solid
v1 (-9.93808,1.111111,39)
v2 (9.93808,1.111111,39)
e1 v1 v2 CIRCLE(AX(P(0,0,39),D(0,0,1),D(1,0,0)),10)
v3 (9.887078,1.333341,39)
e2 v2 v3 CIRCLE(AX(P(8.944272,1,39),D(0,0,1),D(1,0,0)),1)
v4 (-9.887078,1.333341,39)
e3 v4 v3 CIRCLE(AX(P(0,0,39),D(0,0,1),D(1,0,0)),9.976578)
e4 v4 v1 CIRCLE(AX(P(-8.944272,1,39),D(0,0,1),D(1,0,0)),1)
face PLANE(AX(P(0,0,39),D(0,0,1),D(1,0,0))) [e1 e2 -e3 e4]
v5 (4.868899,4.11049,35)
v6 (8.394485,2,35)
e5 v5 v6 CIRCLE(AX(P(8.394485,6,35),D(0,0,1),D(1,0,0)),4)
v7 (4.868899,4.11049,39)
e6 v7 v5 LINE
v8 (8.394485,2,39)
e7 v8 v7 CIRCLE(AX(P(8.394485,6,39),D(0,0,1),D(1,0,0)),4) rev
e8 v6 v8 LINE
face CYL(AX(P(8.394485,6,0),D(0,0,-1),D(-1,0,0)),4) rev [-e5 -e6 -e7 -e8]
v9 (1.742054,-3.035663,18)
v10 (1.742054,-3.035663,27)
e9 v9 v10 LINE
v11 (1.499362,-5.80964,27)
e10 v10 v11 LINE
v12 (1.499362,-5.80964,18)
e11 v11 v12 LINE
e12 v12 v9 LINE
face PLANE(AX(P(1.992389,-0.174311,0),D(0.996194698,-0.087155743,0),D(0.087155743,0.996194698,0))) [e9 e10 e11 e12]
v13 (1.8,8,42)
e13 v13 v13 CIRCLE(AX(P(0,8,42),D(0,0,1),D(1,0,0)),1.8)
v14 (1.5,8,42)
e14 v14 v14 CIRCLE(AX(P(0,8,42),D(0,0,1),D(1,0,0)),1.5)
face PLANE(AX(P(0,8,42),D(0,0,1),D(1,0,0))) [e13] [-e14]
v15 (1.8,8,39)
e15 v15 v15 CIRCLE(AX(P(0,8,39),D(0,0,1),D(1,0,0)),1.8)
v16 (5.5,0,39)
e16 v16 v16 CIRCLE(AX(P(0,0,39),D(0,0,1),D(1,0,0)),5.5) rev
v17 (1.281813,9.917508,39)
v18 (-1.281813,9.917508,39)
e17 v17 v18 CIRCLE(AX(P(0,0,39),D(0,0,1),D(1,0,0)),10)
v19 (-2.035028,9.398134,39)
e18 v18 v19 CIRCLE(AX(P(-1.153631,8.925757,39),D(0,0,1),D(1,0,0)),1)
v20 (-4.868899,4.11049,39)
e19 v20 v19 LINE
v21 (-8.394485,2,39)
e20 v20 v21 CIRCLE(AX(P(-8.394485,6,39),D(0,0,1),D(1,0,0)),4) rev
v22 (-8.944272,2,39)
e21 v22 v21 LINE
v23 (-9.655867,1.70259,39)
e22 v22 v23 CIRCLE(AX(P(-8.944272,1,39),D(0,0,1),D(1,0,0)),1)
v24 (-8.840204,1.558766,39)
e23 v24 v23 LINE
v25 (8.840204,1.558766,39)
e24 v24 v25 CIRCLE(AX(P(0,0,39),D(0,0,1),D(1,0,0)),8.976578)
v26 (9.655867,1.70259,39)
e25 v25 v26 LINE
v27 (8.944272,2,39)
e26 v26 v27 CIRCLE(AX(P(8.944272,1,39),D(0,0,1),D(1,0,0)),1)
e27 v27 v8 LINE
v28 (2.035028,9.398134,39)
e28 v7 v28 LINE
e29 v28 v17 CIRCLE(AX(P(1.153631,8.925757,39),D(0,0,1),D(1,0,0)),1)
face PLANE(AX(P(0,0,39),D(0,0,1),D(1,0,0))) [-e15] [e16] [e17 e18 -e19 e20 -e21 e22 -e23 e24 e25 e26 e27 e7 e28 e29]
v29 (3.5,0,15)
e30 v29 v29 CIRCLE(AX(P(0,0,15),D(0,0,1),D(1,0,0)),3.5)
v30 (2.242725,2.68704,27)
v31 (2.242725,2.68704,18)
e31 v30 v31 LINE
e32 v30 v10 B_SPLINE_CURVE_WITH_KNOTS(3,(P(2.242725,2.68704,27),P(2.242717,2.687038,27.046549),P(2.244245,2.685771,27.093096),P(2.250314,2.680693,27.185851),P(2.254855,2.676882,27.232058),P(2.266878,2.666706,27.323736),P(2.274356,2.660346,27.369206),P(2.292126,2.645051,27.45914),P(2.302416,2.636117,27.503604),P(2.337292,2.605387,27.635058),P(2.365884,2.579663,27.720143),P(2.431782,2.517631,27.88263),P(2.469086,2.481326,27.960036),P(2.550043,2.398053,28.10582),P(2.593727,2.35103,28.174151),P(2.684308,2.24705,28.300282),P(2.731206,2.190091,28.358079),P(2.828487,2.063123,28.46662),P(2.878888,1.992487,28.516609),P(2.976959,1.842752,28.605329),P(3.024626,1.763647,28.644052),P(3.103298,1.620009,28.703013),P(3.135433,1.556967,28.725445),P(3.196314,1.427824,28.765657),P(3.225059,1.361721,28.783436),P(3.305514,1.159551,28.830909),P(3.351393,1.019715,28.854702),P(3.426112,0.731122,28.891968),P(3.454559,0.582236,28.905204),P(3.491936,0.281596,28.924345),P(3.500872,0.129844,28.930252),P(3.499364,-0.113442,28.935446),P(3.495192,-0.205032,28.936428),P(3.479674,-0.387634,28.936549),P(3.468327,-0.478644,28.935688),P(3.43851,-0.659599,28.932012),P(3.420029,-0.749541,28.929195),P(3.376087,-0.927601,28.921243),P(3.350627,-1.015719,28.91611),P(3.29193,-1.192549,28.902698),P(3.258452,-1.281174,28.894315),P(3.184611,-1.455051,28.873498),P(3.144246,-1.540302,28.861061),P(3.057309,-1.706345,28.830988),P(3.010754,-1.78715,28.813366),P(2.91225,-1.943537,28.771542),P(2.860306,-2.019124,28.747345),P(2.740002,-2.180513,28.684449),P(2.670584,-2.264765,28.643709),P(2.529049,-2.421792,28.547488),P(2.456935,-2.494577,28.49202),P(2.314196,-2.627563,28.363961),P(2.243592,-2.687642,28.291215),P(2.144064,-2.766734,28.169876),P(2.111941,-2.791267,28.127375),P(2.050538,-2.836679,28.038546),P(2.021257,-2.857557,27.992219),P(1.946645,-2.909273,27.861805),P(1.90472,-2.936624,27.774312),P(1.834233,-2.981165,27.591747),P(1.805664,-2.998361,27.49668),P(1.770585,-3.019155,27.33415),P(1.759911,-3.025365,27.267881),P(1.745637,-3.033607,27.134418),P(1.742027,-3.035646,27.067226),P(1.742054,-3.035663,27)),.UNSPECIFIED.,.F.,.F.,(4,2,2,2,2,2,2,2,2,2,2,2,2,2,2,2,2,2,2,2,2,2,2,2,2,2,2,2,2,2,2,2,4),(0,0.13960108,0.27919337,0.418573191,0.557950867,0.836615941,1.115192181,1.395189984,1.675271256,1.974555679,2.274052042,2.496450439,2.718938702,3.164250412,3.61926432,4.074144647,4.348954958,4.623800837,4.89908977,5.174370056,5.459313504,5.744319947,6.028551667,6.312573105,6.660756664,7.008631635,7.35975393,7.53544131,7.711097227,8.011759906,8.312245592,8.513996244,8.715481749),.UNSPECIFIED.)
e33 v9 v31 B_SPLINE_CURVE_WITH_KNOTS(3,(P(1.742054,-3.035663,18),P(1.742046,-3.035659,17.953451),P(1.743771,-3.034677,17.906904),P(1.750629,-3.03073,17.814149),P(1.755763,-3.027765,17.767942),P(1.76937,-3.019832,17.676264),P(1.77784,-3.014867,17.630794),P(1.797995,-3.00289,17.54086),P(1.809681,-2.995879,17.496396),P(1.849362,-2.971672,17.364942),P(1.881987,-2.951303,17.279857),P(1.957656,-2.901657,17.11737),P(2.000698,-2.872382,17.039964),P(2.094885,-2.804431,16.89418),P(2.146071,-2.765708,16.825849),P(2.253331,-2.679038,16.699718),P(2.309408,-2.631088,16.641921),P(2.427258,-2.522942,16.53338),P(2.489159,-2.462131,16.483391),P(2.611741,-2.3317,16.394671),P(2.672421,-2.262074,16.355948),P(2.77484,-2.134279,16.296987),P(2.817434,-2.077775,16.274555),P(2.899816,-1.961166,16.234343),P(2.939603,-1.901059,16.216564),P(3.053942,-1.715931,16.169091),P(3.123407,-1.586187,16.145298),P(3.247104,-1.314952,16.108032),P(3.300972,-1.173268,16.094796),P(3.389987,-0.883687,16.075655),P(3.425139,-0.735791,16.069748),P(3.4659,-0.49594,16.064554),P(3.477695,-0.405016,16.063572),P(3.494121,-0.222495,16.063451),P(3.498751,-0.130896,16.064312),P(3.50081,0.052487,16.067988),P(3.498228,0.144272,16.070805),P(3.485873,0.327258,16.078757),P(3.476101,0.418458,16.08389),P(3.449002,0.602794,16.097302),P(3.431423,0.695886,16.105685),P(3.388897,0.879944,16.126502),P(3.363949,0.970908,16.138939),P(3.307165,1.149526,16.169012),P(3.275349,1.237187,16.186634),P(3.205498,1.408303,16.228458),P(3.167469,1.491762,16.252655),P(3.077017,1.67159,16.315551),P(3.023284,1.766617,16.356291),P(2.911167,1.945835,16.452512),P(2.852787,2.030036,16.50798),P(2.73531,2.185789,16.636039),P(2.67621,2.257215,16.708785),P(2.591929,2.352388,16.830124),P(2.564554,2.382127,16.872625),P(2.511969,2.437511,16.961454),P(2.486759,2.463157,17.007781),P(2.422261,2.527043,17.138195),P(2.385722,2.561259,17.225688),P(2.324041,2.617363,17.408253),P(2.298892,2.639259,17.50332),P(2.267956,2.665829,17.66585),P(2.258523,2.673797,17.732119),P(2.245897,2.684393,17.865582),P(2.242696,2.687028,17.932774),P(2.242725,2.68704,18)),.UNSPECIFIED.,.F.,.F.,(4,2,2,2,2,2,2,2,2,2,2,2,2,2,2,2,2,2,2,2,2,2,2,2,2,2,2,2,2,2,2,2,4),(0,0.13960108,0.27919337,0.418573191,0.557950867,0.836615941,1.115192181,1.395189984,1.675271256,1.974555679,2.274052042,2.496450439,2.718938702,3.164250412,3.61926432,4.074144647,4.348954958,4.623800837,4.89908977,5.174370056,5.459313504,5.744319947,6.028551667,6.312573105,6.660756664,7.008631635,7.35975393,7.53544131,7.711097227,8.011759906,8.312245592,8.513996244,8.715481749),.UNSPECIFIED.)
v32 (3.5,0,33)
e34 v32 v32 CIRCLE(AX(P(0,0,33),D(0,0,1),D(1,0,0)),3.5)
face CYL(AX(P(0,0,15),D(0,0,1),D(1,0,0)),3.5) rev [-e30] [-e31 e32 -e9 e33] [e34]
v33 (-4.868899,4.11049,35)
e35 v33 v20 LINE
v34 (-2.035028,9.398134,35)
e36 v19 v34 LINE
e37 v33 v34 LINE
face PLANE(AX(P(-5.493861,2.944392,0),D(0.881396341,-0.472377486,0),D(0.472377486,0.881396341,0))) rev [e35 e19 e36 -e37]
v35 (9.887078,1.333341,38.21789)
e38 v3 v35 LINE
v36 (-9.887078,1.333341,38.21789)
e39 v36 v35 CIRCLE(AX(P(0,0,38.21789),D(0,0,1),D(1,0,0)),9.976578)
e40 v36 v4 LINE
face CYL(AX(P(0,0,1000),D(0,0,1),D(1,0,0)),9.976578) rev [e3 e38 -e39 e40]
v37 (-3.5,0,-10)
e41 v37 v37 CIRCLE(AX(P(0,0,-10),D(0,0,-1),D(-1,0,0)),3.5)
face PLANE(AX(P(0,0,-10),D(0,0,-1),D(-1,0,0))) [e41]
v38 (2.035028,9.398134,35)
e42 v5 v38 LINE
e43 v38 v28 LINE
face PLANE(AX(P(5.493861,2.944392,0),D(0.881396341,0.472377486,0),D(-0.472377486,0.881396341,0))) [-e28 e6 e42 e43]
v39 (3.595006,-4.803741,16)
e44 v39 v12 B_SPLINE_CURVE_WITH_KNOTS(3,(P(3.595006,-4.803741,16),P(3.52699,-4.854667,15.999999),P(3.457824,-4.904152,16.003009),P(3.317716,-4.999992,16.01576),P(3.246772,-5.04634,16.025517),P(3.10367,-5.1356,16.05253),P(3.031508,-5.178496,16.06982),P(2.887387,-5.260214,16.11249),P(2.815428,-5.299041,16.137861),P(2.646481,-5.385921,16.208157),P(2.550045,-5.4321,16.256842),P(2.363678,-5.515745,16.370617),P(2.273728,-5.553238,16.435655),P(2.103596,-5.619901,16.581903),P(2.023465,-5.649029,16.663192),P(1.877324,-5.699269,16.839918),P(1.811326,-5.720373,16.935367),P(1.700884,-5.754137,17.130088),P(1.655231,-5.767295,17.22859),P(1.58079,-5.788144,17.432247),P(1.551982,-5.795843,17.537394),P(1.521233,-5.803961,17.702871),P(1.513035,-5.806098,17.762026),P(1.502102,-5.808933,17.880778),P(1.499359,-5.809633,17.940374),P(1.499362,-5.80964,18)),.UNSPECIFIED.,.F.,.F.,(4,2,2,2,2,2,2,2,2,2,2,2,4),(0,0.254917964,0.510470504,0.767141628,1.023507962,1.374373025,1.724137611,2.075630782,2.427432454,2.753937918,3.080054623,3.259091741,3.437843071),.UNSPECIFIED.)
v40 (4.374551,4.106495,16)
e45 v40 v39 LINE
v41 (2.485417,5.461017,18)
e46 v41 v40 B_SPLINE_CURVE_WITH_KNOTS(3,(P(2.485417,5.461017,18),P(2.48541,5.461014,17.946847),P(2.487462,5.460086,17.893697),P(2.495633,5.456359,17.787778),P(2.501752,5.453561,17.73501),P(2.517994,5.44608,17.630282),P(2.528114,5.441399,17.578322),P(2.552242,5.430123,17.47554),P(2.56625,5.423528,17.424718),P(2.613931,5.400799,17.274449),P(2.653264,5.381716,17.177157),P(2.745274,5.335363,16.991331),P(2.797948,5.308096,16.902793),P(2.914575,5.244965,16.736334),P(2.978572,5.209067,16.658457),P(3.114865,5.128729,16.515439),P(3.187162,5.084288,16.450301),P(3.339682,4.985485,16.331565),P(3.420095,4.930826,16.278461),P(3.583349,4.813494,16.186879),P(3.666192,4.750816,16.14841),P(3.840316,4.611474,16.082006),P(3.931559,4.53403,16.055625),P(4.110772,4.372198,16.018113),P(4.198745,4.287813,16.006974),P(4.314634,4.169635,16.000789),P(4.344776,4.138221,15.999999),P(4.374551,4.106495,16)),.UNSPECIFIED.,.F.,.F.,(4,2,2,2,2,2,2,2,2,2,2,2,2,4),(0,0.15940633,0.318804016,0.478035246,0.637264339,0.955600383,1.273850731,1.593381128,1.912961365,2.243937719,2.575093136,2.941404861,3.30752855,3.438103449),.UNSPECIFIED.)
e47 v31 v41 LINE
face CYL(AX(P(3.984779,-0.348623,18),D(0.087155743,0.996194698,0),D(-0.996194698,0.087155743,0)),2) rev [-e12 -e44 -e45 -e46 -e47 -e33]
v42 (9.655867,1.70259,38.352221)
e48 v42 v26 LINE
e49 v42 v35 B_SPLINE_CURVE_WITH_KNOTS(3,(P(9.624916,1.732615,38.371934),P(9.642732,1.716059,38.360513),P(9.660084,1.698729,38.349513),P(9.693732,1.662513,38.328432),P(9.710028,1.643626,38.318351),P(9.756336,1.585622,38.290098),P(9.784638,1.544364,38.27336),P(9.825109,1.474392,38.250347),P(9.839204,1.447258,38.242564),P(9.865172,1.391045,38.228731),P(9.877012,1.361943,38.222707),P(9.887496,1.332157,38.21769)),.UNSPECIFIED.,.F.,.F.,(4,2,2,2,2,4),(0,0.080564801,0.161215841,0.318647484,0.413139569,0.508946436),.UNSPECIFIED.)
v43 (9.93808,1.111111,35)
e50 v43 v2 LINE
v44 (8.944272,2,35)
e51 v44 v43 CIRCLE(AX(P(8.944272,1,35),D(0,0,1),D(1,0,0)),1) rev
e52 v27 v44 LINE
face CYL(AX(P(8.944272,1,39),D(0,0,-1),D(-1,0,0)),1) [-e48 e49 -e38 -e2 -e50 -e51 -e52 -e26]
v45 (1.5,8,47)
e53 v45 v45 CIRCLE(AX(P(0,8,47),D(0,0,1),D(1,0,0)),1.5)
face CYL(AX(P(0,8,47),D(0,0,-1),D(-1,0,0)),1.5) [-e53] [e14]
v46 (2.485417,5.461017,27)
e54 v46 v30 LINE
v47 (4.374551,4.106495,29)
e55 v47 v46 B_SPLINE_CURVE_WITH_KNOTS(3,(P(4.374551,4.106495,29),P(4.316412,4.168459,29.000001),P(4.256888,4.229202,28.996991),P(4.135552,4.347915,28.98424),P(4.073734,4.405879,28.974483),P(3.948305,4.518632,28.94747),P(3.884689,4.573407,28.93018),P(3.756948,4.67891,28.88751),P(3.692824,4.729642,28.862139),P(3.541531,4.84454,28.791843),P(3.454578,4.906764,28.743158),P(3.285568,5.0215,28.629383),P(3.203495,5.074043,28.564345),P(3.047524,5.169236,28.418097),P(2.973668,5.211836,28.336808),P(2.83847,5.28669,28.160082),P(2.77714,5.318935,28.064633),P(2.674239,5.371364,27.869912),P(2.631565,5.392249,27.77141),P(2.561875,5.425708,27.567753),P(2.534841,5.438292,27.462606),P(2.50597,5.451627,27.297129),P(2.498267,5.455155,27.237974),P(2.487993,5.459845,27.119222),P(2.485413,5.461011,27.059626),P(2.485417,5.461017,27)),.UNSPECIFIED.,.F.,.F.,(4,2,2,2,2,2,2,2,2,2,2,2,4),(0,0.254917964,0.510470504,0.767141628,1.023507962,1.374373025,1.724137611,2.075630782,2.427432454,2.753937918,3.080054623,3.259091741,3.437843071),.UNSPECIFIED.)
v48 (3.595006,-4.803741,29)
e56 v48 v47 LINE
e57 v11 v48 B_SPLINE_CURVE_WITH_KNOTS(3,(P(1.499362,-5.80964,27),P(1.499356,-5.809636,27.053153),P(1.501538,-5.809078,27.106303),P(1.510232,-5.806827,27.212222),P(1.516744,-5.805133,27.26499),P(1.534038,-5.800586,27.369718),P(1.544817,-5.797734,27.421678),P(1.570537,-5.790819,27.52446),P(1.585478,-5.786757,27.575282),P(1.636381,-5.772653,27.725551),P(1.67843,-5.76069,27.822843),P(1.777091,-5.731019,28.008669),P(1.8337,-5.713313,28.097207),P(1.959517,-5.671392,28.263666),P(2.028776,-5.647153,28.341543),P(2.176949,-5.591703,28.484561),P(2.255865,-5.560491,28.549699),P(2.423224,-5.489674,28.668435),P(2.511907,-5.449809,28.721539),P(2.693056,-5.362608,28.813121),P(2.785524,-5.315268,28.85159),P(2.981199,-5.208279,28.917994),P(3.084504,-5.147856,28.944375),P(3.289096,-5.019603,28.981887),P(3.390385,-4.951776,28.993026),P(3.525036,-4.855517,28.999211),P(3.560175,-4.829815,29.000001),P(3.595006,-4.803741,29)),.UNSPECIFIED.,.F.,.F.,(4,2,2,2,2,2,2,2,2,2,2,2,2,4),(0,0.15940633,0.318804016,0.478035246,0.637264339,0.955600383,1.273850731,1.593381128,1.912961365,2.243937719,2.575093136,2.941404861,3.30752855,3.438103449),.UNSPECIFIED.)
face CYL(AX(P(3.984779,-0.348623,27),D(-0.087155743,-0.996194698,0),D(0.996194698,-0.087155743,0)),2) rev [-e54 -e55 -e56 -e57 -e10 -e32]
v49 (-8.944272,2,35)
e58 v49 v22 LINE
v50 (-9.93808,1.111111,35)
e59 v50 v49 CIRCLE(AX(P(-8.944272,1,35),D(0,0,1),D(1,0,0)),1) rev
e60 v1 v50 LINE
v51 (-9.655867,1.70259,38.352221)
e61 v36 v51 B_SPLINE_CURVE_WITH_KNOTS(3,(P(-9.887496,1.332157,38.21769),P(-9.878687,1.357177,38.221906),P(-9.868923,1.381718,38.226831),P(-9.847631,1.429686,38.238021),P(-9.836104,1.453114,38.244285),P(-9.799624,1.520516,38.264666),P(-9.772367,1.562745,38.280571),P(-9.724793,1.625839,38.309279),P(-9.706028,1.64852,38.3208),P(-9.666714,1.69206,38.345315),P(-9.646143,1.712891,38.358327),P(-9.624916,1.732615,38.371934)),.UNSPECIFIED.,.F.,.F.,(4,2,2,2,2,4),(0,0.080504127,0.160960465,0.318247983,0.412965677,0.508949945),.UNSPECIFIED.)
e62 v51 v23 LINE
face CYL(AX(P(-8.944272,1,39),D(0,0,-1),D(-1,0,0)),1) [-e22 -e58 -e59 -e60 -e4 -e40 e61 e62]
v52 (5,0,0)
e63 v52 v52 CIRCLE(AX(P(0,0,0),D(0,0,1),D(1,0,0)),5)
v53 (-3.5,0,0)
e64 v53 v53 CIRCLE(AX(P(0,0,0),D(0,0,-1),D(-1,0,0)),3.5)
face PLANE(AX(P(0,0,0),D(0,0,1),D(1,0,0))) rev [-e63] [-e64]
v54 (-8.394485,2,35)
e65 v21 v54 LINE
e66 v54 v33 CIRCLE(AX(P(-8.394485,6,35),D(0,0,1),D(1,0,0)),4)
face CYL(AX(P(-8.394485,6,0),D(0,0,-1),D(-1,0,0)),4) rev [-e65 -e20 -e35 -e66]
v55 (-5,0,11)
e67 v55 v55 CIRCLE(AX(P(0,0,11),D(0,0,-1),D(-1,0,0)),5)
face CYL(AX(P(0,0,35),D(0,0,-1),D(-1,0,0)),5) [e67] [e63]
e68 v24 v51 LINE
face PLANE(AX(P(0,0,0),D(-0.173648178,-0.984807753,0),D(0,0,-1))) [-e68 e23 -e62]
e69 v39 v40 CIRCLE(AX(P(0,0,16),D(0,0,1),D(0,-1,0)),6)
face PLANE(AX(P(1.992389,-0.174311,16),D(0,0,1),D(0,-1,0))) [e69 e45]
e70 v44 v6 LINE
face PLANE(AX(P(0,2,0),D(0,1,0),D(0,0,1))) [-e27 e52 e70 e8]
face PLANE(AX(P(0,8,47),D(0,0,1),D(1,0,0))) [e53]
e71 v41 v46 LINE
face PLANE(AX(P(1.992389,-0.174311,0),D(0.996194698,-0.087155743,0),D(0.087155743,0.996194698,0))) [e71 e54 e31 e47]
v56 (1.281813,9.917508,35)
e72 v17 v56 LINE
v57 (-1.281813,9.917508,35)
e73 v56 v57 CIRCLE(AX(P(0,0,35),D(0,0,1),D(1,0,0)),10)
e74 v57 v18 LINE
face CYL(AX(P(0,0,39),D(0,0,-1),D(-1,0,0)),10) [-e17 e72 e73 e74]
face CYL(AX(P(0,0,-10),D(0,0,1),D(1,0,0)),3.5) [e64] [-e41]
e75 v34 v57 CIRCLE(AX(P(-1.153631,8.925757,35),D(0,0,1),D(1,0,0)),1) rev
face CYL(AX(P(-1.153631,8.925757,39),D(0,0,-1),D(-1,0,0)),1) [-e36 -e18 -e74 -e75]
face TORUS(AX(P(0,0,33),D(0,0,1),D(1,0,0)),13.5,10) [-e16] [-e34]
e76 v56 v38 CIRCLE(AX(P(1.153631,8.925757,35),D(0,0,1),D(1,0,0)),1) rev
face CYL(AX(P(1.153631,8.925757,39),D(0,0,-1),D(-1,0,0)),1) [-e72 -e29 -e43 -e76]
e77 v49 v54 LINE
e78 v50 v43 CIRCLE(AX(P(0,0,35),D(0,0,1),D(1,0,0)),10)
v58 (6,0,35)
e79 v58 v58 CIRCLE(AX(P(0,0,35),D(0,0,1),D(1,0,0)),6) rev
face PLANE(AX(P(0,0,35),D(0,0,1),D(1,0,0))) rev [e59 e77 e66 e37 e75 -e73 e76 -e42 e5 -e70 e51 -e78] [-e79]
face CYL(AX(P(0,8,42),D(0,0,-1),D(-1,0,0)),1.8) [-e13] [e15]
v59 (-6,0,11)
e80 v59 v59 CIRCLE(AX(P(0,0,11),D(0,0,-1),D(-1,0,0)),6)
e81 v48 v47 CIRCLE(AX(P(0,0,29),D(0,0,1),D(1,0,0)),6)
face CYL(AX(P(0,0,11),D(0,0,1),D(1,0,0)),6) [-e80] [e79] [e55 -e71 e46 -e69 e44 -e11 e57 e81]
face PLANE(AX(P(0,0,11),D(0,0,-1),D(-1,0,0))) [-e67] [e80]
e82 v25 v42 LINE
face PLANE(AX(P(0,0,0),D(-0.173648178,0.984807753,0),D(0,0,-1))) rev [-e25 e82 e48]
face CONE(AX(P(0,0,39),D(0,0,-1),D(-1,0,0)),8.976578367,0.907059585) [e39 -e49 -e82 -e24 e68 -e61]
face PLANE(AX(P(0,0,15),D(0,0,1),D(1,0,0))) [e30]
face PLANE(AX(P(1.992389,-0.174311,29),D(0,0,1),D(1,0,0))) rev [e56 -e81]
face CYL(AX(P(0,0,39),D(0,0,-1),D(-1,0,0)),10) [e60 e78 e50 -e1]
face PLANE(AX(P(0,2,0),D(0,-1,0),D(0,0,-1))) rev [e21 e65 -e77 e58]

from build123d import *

# Parameters (mm, degrees)
SKETCH1_R           = 5
BOSS_EXTRUDE1_DEPTH = 35
SKETCH3_R           = 10
BOSS_EXTRUDE3_DEPTH = 4
BOSS_EXTRUDE4_START = 24
SKETCH4_R           = 6
SKETCH4_R_2         = 5
BOSS_EXTRUDE4_DEPTH = 24
CUT_EXTRUDE1_DEPTH  = 42.484937025
FILLET1_R           = 1
SKETCH6_R           = 3.5
CUT_EXTRUDE2_DEPTH  = 24
CHAMFER1_SIZE       = 2
FILLET2_R           = 10
SKETCH7_R           = 1.5
BOSS_EXTRUDE5_DEPTH = 8
FILLET3_R           = 4
CUT_REVOLVE1_ANGLE  = 200
SKETCH9_R           = 1.8
SKETCH9_R_2         = 1.5
BOSS_EXTRUDE6_DEPTH = 3
SKETCH10_R          = 3.5
BOSS_EXTRUDE7_DEPTH = 10
SKETCH14_W          = 13
SKETCH14_H          = 12
CUT_EXTRUDE3_DEPTH  = 4
FILLET4_R           = 2


with BuildPart() as part:
    # Sketch1 → Boss-Extrude1 (new body)
    with BuildSketch(Plane.XY):
        Circle(SKETCH1_R)
    extrude(amount=BOSS_EXTRUDE1_DEPTH)

    # Sketch3 → Boss-Extrude3 (add)
    with BuildSketch(Plane.XY.offset(35)):
        Circle(SKETCH3_R)
    extrude(amount=BOSS_EXTRUDE3_DEPTH)

    # Sketch4 → Boss-Extrude4 (add)
    with BuildSketch(Plane(origin=(0, 0, 35), x_dir=(-1, 0, 0), z_dir=(0, 0, -1)).offset(BOSS_EXTRUDE4_START)):
        with Locations(Location((0, 0, 0), (0, 0, 180))):
            Circle(SKETCH4_R)
        Circle(SKETCH4_R_2, mode=Mode.SUBTRACT)
    extrude(amount=-BOSS_EXTRUDE4_DEPTH)

    # Sketch5 → Cut-Extrude1 (cut, through all)
    with BuildSketch(Plane.XY.offset(39)):
        with BuildLine():
            ThreePointArc((-1.8, 9.836666102), (-6.99867823, 7.142723782), (-9.797958971, 2))
            Line((-9.797958971, 2), (-6, 2))
            Line((-6, 2), (-1.8, 9.836666102))
        make_face()
        with BuildLine():
            ThreePointArc((9.797958971, 2), (6.99867823, 7.142723782), (1.8, 9.836666102))
            Line((1.8, 9.836666102), (6, 2))
            Line((6, 2), (9.797958971, 2))
        make_face()
    extrude(amount=-CUT_EXTRUDE1_DEPTH, mode=Mode.SUBTRACT)

    # Fillet1
    fillet1_edges = [part.edges().sort_by_distance(p)[0] for p in [
        (-9.797958971, 2, 37),
        (-1.8, 9.836666102, 37),
        (1.8, 9.836666102, 37),
        (9.797958971, 2, 37),
    ]]
    fillet(fillet1_edges, radius=FILLET1_R)

    # Sketch6 → Cut-Extrude2 (cut)
    with BuildSketch(Plane.XY.offset(39)):
        Circle(SKETCH6_R)
    extrude(amount=-CUT_EXTRUDE2_DEPTH, mode=Mode.SUBTRACT)

    # Chamfer1
    chamfer1_edges = [part.edges().sort_by_distance(p)[0] for p in [
        (-3.5, 0, 39),
    ]]
    chamfer(chamfer1_edges, length=CHAMFER1_SIZE)

    # Fillet2
    # the kernel refuses this fillet: 10 mm, written as the material it takes off along each edge
    with BuildSketch(Plane(origin=(0, 0, 37), x_dir=(1, 0, 0), z_dir=(0, -1, 0))) as fillet2_piece_1:
        with BuildLine():
            CenterArc((13.5, -4), FILLET2_R, 143.130102354, 36.869897646)
            Line((3.5, -4), (3.3, -4))
            Line((3.3, -4), (3.3, 0))
            Line((3.3, 0), (3.358578644, 0.141421356))
            ThreePointArc((3.358578644, 0.141421356), (4.358578644, 1.141421356), (5.34, 2.12))
            Line((5.34, 2.12), (5.5, 2))
        make_face()
    revolve(axis=Axis((0, 0, 37), (0, 0, 1)), mode=Mode.SUBTRACT)

    # Sketch7 → Boss-Extrude5 (add)
    with BuildSketch(Plane.XY.offset(39)):
        with Locations((0, 8)):
            Circle(SKETCH7_R)
    extrude(amount=BOSS_EXTRUDE5_DEPTH)

    # Fillet3
    fillet3_edges = [part.edges().sort_by_distance(p)[0] for p in [
        (-6, 2, 37),
        (6, 2, 37),
    ]]
    fillet(fillet3_edges, radius=FILLET3_R)

    # Sketch8 → Cut-Revolve1 (revolve, symmetric, cut)
    with BuildSketch(Plane(origin=(0, 0, 0), x_dir=(0, 0, -1), z_dir=(1, 0, 0))) as cut_revolve1_sk:
        Polygon((-38.217890117, -9.976578367), (-39, -8.976578367), (-39, -9.976578367), align=None)
    revolve(axis=Axis((0, 0, 1000), (0, 0, -1)), revolution_arc=CUT_REVOLVE1_ANGLE / 2, mode=Mode.SUBTRACT)
    revolve(cut_revolve1_sk.sketch, axis=Axis((0, 0, 1000), (0, 0, 1)), revolution_arc=CUT_REVOLVE1_ANGLE / 2, mode=Mode.SUBTRACT)

    # Sketch9 → Boss-Extrude6 (add)
    with BuildSketch(Plane.XY.offset(39)):
        with Locations((0, 8)):
            Circle(SKETCH9_R)
        with Locations((0, 8)):
            Circle(SKETCH9_R_2, mode=Mode.SUBTRACT)
    extrude(amount=BOSS_EXTRUDE6_DEPTH)

    # Sketch10 → Boss-Extrude7 (add)
    with BuildSketch(Plane(origin=(0, 0, 0), x_dir=(-1, 0, 0), z_dir=(0, 0, -1))):
        with Locations(Location((0, 0, 0), (0, 0, 180))):
            Circle(SKETCH10_R)
    extrude(amount=BOSS_EXTRUDE7_DEPTH)

    # Sketch14 → Cut-Extrude3 (cut)
    with BuildSketch(Plane(origin=(5.977168189, -0.522934456, 0), x_dir=(0, 0, -1), z_dir=(0.9961946980917453, -0.08715574274766187, 0))):
        with Locations((-22.5, 0)):
            Rectangle(SKETCH14_W, SKETCH14_H)
    extrude(amount=-CUT_EXTRUDE3_DEPTH, mode=Mode.SUBTRACT)

    # Fillet4
    # the kernel refuses this fillet: 2 mm, written as the material it adds along each edge
    with BuildSketch(Plane(origin=(1.806946495, -2.29393355, 16), x_dir=(0, 0, 1), z_dir=(0.08715574274766187, 0.9961946980917453, 0))) as fillet4_piece_1_section:
        with BuildLine():
            CenterArc((FILLET4_R, FILLET4_R), FILLET4_R, 180, 90)
            Line((0, FILLET4_R), (0, 0))
            Line((0, 0), (FILLET4_R, 0))
        make_face()
    fillet4_piece_1 = extrude(amount=12.784572926, mode=Mode.PRIVATE)
    fillet4_piece_1 = fillet4_piece_1 - Plane(origin=(0, 0, 16.407191897), x_dir=(1, 0, 0), z_dir=(0, 0, 1)) * Cylinder(3.5, 34, mode=Mode.PRIVATE)
    fillet4_piece_1 = fillet4_piece_1 & Plane(origin=(0, 0, 16.407191897), x_dir=(1, 0, 0), z_dir=(0, 0, -1)) * Cylinder(6, 34, mode=Mode.PRIVATE)
    add(fillet4_piece_1)
    with BuildSketch(Plane(origin=(1.063583349, -10.790613187, 16), x_dir=(0.9961946980917453, -0.08715574274766187, 0), z_dir=(0.08715574274766187, 0.9961946980917453, 0))) as fillet4_piece_2_section:
        with BuildLine():
            CenterArc((FILLET4_R, -FILLET4_R), FILLET4_R, 90, 90)
            Line((0, -FILLET4_R), (0, 0))
            Line((0, 0), (FILLET4_R, 0))
        make_face()
    fillet4_piece_2 = extrude(amount=12.784572926, mode=Mode.PRIVATE)
    fillet4_piece_2 = fillet4_piece_2 - Plane(origin=(0, 0, 16.407193431), x_dir=(1, 0, 0), z_dir=(0, 0, 1)) * Cylinder(3.5, 34, mode=Mode.PRIVATE)
    fillet4_piece_2 = fillet4_piece_2 & Plane(origin=(0, 0, 16.407193431), x_dir=(1, 0, 0), z_dir=(0, 0, -1)) * Cylinder(6, 34, mode=Mode.PRIVATE)
    add(fillet4_piece_2)
    with BuildSketch(Plane(origin=(2.177832298, 1.945310579, 29), x_dir=(0, 0, -1), z_dir=(-0.08715574274766187, -0.9961946980917453, 0))) as fillet4_piece_3_section:
        with BuildLine():
            CenterArc((FILLET4_R, FILLET4_R), FILLET4_R, 180, 90)
            Line((0, FILLET4_R), (0, 0))
            Line((0, 0), (FILLET4_R, 0))
        make_face()
    fillet4_piece_3 = extrude(amount=12.784572926, mode=Mode.PRIVATE)
    fillet4_piece_3 = fillet4_piece_3 - Plane(origin=(0, 0, 28.592806917), x_dir=(1, 0, 0), z_dir=(0, 0, 1)) * Cylinder(3.5, 34, mode=Mode.PRIVATE)
    fillet4_piece_3 = fillet4_piece_3 & Plane(origin=(0, 0, 28.592806917), x_dir=(1, 0, 0), z_dir=(0, 0, -1)) * Cylinder(6, 34, mode=Mode.PRIVATE)
    add(fillet4_piece_3)
    with BuildSketch(Plane(origin=(2.921195444, 10.441990216, 29), x_dir=(0, 0, -1), z_dir=(-0.08715574274766187, -0.9961946980917453, 0))) as fillet4_piece_4_section:
        with BuildLine():
            CenterArc((FILLET4_R, FILLET4_R), FILLET4_R, 180, 90)
            Line((0, FILLET4_R), (0, 0))
            Line((0, 0), (FILLET4_R, 0))
        make_face()
    fillet4_piece_4 = extrude(amount=12.784572926, mode=Mode.PRIVATE)
    fillet4_piece_4 = fillet4_piece_4 - Plane(origin=(0, 0, 28.592808103), x_dir=(1, 0, 0), z_dir=(0, 0, 1)) * Cylinder(3.5, 34, mode=Mode.PRIVATE)
    fillet4_piece_4 = fillet4_piece_4 & Plane(origin=(0, 0, 28.592808103), x_dir=(1, 0, 0), z_dir=(0, 0, -1)) * Cylinder(6, 34, mode=Mode.PRIVATE)
    add(fillet4_piece_4)


solid = part.part
